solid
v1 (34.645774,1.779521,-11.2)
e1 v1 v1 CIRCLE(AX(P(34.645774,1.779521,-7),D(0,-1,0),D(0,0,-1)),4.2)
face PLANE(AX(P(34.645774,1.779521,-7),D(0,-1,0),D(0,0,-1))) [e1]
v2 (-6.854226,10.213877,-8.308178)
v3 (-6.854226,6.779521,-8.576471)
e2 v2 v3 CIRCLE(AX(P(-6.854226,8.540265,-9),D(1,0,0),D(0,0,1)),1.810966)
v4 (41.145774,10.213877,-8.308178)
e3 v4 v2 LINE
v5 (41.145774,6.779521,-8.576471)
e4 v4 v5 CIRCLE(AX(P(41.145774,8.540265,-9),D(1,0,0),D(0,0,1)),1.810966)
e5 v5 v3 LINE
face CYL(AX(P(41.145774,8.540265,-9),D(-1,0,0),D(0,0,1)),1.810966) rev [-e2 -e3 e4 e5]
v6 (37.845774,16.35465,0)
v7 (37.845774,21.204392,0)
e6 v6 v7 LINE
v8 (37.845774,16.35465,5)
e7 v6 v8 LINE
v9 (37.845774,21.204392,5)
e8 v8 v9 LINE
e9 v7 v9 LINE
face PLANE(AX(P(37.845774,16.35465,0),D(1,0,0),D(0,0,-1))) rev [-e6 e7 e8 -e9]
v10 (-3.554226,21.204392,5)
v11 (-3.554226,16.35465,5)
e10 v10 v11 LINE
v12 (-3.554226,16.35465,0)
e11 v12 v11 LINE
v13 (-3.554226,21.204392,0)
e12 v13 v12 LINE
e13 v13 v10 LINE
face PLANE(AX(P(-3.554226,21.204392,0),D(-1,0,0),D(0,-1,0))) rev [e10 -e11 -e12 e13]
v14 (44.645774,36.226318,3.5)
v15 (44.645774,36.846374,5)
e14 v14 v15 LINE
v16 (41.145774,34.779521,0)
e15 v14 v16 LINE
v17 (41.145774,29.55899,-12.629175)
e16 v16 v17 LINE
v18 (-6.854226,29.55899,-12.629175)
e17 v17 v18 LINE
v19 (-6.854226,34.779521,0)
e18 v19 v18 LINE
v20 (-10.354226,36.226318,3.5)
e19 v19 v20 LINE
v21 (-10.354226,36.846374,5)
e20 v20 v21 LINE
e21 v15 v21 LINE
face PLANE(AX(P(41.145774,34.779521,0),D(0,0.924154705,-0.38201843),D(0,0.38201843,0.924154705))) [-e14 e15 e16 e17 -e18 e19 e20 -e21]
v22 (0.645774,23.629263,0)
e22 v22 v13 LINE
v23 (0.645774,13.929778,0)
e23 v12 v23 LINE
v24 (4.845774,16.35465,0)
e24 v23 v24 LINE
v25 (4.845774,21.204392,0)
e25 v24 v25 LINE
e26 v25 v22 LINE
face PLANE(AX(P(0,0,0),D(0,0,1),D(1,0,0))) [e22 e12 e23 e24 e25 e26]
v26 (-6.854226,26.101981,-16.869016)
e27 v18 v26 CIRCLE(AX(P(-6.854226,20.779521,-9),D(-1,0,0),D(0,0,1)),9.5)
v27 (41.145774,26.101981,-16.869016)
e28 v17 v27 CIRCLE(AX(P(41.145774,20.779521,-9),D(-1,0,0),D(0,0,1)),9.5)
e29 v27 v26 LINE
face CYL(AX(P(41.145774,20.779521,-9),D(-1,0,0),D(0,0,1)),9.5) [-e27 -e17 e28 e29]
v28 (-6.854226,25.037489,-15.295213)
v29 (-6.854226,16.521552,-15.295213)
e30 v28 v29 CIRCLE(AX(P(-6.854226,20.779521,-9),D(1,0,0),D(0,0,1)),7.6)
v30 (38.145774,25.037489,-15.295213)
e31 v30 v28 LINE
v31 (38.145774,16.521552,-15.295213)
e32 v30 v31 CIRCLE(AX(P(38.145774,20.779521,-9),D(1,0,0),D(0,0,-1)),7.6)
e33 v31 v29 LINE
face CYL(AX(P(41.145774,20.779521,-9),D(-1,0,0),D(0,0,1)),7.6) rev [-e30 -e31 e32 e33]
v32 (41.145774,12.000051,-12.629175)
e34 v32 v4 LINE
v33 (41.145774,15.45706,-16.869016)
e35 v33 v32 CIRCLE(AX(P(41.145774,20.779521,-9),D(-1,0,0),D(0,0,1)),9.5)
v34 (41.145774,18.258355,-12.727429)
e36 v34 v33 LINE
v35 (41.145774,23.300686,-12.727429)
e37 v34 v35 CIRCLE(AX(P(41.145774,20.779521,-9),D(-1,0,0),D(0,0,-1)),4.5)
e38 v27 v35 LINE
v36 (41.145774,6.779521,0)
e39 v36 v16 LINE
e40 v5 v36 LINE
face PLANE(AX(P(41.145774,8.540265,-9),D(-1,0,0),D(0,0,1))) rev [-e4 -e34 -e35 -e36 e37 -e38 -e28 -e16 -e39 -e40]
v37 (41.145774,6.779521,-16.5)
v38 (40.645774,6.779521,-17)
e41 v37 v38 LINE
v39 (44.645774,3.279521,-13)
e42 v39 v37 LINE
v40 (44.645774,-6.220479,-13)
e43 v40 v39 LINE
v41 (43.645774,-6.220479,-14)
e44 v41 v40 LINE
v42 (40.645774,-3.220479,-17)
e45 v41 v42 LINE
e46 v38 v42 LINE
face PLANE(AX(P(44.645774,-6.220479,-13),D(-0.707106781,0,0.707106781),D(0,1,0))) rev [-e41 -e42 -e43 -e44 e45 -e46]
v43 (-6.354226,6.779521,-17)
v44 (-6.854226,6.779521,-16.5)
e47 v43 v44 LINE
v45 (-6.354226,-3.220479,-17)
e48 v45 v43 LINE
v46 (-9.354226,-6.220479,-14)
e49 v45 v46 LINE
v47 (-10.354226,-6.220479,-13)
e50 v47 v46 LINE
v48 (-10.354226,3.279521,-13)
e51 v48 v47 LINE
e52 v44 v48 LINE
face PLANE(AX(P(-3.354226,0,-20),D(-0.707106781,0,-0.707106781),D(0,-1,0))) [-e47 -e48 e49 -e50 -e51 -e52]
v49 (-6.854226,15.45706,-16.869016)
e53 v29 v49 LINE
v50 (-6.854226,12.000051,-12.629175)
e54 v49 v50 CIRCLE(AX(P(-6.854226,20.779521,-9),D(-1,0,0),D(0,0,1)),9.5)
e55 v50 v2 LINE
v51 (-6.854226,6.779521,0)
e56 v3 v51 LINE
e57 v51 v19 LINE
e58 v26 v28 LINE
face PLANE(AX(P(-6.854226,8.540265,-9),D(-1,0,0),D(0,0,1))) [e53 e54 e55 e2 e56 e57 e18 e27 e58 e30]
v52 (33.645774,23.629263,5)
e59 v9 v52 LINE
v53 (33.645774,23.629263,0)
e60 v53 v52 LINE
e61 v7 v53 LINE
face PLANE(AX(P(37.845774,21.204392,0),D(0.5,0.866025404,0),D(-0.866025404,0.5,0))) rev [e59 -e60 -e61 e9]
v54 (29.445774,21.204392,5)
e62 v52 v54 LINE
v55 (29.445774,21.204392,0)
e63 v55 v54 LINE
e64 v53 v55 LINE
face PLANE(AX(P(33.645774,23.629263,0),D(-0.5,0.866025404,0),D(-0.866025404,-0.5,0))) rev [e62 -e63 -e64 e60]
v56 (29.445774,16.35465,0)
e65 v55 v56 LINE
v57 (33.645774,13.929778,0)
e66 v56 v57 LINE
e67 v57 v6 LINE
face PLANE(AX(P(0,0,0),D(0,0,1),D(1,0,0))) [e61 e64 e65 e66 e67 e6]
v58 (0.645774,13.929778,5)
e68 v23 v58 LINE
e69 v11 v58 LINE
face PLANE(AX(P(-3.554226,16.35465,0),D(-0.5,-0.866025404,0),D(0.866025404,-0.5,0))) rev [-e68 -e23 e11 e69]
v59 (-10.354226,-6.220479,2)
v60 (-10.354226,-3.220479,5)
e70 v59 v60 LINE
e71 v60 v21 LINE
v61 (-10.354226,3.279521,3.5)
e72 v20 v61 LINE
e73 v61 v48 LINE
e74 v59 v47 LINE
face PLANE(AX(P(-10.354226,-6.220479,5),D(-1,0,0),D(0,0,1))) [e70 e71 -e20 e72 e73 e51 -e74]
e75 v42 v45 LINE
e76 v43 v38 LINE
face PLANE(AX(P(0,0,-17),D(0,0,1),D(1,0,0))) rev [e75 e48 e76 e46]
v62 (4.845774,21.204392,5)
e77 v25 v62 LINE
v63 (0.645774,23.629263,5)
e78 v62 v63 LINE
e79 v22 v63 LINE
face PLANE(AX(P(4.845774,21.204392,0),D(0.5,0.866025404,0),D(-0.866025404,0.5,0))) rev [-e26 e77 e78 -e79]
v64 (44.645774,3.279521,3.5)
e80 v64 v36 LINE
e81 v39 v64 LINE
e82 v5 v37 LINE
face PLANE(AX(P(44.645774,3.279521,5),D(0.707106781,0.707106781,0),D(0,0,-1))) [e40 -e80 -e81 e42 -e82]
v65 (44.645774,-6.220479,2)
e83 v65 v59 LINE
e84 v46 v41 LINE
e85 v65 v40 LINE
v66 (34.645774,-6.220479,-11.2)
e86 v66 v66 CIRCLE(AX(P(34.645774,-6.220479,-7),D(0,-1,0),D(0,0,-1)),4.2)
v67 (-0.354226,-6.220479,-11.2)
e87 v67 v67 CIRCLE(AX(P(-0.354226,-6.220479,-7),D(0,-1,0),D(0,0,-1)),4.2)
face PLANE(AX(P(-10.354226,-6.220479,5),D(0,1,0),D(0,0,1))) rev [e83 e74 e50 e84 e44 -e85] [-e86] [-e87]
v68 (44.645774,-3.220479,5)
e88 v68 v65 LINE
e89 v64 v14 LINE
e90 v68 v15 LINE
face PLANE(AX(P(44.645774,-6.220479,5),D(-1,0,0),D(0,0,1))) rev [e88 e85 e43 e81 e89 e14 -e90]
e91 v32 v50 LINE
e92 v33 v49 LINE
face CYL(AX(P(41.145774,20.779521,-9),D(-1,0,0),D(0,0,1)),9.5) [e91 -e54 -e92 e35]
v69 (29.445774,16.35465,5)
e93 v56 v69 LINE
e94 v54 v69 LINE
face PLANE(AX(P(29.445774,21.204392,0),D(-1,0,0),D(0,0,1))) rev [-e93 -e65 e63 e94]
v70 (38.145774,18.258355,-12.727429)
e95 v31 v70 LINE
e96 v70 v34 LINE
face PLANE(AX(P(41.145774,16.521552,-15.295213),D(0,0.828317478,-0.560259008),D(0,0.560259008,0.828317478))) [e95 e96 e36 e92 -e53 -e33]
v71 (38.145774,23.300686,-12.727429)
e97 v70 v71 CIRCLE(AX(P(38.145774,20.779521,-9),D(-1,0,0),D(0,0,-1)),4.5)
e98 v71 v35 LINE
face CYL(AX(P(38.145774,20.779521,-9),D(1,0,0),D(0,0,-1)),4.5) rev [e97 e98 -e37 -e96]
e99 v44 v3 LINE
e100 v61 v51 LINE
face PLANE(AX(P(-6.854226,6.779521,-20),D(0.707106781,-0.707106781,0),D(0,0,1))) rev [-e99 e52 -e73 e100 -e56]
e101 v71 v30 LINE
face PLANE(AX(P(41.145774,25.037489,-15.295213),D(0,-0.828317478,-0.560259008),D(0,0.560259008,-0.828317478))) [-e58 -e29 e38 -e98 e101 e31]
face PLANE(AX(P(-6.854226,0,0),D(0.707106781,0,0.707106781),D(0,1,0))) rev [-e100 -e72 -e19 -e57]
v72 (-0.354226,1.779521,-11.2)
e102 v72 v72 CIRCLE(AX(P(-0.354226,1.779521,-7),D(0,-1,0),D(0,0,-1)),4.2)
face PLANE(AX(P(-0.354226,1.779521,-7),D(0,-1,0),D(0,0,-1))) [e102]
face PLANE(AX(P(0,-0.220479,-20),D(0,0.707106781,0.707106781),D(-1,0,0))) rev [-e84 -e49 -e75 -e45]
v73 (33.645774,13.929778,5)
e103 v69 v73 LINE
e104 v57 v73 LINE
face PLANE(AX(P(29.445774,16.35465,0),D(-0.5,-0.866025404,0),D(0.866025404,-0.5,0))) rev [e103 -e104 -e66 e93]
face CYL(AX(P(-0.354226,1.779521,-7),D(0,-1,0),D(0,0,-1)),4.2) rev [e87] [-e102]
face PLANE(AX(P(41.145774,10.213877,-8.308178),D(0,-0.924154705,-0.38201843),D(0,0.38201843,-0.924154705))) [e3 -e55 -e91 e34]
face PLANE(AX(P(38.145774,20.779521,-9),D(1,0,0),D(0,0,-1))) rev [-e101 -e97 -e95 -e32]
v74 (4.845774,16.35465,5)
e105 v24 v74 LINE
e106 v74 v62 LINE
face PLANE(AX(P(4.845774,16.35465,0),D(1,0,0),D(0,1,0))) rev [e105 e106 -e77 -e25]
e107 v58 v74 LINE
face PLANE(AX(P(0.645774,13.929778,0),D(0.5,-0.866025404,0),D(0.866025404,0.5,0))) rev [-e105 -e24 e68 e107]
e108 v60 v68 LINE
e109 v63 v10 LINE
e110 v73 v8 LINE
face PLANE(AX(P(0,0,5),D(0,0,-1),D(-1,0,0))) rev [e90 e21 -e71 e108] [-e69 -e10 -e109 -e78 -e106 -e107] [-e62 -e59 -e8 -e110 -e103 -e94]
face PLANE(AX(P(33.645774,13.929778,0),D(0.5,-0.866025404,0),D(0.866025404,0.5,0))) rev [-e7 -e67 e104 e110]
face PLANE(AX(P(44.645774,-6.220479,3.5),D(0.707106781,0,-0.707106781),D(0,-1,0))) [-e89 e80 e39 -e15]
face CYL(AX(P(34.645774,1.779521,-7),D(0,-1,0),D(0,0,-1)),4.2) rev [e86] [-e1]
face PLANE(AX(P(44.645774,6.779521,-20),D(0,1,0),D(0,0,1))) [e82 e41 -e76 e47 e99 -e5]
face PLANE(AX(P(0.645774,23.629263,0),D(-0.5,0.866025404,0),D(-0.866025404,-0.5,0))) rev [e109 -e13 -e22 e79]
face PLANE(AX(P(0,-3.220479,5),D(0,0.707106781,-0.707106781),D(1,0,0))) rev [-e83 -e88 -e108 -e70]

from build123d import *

# Parameters (mm, degrees)
SKETCH1_W           = 55
SKETCH1_H           = 45
BOSS_EXTRUDE1_DEPTH = 5
SKETCH3_W           = 55
SKETCH3_H           = 13
BOSS_EXTRUDE5_DEPTH = 20
CHAMFER1_SIZE       = 3
SKETCH5_R           = 4.2
CUT_EXTRUDE2_DEPTH  = 8
BOSS_EXTRUDE7_DEPTH = 48
CUT_EXTRUDE3_DEPTH  = 71.205777697
CHAMFER2_SIZE       = 3.5
CHAMFER3_SIZE       = 3.5
CHAMFER4_SIZE       = 7
BOSS_EXTRUDE8_START = -3
BOSS_EXTRUDE8_DEPTH = 3
CHAMFER5_SIZE       = 6
CUT_EXTRUDE4_DEPTH  = 5
SKETCH11_W          = 55
SKETCH11_H          = 13.699454105
CUT_EXTRUDE5_DEPTH  = 3


with BuildPart() as part:
    # Sketch1 → Boss-Extrude1 (new body)
    with BuildSketch(Plane.XY):
        with Locations((17.145774036, 16.279520652)):
            Rectangle(SKETCH1_W, SKETCH1_H)
    extrude(amount=BOSS_EXTRUDE1_DEPTH)

    # Sketch3 → Boss-Extrude5 (add)
    with BuildSketch(Plane(origin=(0, 0, 0), x_dir=(-1, 0, 0), z_dir=(0, 0, -1))):
        with Locations((-17.145774036, 0.279520652)):
            Rectangle(SKETCH3_W, SKETCH3_H)
    extrude(amount=BOSS_EXTRUDE5_DEPTH)

    # Chamfer1
    chamfer1_edges = [part.edges().sort_by_distance(p)[0] for p in [
        (17.145774036, -6.220479348, 5),
    ]]
    chamfer(chamfer1_edges, length=CHAMFER1_SIZE)

    # Sketch5 → Cut-Extrude2 (cut)
    with BuildSketch(Plane.XZ.offset(6.220479348)):
        with Locations(Location((-0.354225964, -7, 0), (0, 0, 270))):
            Circle(SKETCH5_R)
        with Locations(Location((34.645774036, -7, 0), (0, 0, 270))):
            Circle(SKETCH5_R)
    extrude(amount=-CUT_EXTRUDE2_DEPTH, mode=Mode.SUBTRACT)

    # Sketch7 → Boss-Extrude7 (add)
    with BuildSketch(Plane.ZY.offset(6.854225964)):
        with BuildLine():
            Line((-8.308177677, 10.21387745), (-12.629175087, 12.000050953))
            ThreePointArc((-12.629175087, 12.000050953), (-15.003318067, 13.416764905), (-16.86901604, 15.457060078))
            Line((-16.86901604, 15.457060078), (-15.295212832, 16.521552193))
            ThreePointArc((-15.295212832, 16.521552193), (-1.4, 20.779520652), (-15.295212832, 25.037489111))
            Line((-15.295212832, 25.037489111), (-16.86901604, 26.101981226))
            ThreePointArc((-16.86901604, 26.101981226), (-15.003318067, 28.142276398), (-12.629175087, 29.55899035))
            Line((-12.629175087, 29.55899035), (0, 34.779520652))
            Line((0, 34.779520652), (0, 6.779520652))
            Line((0, 6.779520652), (-8.576470695, 6.779520652))
            ThreePointArc((-8.576470695, 6.779520652), (-7.194534972, 8.39922137), (-8.308177677, 10.21387745))
        make_face()
    extrude(amount=-BOSS_EXTRUDE7_DEPTH)

    # Sketch8 → Cut-Extrude3 (cut, through all)
    with BuildSketch(Plane.ZY.offset(10.354225964)):
        Polygon((0, 34.779520652), (5, 36.846373896), (5, 38.779520652), (0, 38.779520652), align=None)
    extrude(amount=-CUT_EXTRUDE3_DEPTH, mode=Mode.SUBTRACT)

    # Chamfer2
    chamfer2_edges = [part.edges().sort_by_distance(p)[0] for p in [
        (-10.354225964, 6.779520652, -10),
        (-10.354225964, 20.779520652, 0),
    ]]
    chamfer(chamfer2_edges, length=CHAMFER2_SIZE - 0.0001)  # a hair under: the kernel refuses the full size

    # Chamfer3
    chamfer3_edges = [part.edges().sort_by_distance(p)[0] for p in [
        (44.645774036, 20.779520652, 0),
        (44.645774036, 6.779520652, -10),
    ]]
    chamfer(chamfer3_edges, length=CHAMFER3_SIZE - 0.0001)  # a hair under: the kernel refuses the full size

    # Chamfer4
    chamfer4_edges = [part.edges().sort_by_distance(p)[0] for p in [
        (44.645774036, -1.470429348, -20),
        (-10.354225964, -1.470429348, -20),
    ]]
    chamfer(chamfer4_edges, length=CHAMFER4_SIZE)

    # Sketch9 → Boss-Extrude8 (add)
    with BuildSketch(Plane(origin=(41.145774036, 0, 0), x_dir=(0, 0, -1), z_dir=(1, 0, 0)).offset(BOSS_EXTRUDE8_START)):
        with BuildLine():
            Line((15.295212832, 16.521552193), (12.727428651, 18.258355117))
            ThreePointArc((12.727428651, 18.258355117), (4.5, 20.779520652), (12.727428651, 23.300686187))
            Line((12.727428651, 23.300686187), (15.295212832, 25.037489111))
            ThreePointArc((15.295212832, 25.037489111), (1.4, 20.779520652), (15.295212832, 16.521552193))
        make_face()
    extrude(amount=BOSS_EXTRUDE8_DEPTH)

    # Chamfer5
    chamfer5_edges = [part.edges().sort_by_distance(p)[0] for p in [
        (17.145774036, -6.220479348, -20),
    ]]
    chamfer(chamfer5_edges, length=CHAMFER5_SIZE)

    # Sketch10 → Cut-Extrude4 (cut)
    with BuildSketch(Plane.XY.offset(5)):
        Polygon((33.645774036, 13.92977839), (37.845774036, 16.354649521), (37.845774036, 21.204391782), (33.645774036, 23.629262913), (29.445774036, 21.204391782), (29.445774036, 16.354649521), align=None)
        Polygon((0.645774036, 13.92977839), (4.845774036, 16.354649521), (4.845774036, 21.204391782), (0.645774036, 23.629262913), (-3.554225964, 21.204391782), (-3.554225964, 16.354649521), align=None)
    extrude(amount=-CUT_EXTRUDE4_DEPTH, mode=Mode.SUBTRACT)

    # Sketch11 → Cut-Extrude5 (cut)
    with BuildSketch(Plane(origin=(0, 0, -20), x_dir=(-1, 0, 0), z_dir=(0, 0, -1))):
        with Locations((-17.145774036, 0.629247705)):
            Rectangle(SKETCH11_W, SKETCH11_H)
    extrude(amount=-CUT_EXTRUDE5_DEPTH, mode=Mode.SUBTRACT)


solid = part.part
